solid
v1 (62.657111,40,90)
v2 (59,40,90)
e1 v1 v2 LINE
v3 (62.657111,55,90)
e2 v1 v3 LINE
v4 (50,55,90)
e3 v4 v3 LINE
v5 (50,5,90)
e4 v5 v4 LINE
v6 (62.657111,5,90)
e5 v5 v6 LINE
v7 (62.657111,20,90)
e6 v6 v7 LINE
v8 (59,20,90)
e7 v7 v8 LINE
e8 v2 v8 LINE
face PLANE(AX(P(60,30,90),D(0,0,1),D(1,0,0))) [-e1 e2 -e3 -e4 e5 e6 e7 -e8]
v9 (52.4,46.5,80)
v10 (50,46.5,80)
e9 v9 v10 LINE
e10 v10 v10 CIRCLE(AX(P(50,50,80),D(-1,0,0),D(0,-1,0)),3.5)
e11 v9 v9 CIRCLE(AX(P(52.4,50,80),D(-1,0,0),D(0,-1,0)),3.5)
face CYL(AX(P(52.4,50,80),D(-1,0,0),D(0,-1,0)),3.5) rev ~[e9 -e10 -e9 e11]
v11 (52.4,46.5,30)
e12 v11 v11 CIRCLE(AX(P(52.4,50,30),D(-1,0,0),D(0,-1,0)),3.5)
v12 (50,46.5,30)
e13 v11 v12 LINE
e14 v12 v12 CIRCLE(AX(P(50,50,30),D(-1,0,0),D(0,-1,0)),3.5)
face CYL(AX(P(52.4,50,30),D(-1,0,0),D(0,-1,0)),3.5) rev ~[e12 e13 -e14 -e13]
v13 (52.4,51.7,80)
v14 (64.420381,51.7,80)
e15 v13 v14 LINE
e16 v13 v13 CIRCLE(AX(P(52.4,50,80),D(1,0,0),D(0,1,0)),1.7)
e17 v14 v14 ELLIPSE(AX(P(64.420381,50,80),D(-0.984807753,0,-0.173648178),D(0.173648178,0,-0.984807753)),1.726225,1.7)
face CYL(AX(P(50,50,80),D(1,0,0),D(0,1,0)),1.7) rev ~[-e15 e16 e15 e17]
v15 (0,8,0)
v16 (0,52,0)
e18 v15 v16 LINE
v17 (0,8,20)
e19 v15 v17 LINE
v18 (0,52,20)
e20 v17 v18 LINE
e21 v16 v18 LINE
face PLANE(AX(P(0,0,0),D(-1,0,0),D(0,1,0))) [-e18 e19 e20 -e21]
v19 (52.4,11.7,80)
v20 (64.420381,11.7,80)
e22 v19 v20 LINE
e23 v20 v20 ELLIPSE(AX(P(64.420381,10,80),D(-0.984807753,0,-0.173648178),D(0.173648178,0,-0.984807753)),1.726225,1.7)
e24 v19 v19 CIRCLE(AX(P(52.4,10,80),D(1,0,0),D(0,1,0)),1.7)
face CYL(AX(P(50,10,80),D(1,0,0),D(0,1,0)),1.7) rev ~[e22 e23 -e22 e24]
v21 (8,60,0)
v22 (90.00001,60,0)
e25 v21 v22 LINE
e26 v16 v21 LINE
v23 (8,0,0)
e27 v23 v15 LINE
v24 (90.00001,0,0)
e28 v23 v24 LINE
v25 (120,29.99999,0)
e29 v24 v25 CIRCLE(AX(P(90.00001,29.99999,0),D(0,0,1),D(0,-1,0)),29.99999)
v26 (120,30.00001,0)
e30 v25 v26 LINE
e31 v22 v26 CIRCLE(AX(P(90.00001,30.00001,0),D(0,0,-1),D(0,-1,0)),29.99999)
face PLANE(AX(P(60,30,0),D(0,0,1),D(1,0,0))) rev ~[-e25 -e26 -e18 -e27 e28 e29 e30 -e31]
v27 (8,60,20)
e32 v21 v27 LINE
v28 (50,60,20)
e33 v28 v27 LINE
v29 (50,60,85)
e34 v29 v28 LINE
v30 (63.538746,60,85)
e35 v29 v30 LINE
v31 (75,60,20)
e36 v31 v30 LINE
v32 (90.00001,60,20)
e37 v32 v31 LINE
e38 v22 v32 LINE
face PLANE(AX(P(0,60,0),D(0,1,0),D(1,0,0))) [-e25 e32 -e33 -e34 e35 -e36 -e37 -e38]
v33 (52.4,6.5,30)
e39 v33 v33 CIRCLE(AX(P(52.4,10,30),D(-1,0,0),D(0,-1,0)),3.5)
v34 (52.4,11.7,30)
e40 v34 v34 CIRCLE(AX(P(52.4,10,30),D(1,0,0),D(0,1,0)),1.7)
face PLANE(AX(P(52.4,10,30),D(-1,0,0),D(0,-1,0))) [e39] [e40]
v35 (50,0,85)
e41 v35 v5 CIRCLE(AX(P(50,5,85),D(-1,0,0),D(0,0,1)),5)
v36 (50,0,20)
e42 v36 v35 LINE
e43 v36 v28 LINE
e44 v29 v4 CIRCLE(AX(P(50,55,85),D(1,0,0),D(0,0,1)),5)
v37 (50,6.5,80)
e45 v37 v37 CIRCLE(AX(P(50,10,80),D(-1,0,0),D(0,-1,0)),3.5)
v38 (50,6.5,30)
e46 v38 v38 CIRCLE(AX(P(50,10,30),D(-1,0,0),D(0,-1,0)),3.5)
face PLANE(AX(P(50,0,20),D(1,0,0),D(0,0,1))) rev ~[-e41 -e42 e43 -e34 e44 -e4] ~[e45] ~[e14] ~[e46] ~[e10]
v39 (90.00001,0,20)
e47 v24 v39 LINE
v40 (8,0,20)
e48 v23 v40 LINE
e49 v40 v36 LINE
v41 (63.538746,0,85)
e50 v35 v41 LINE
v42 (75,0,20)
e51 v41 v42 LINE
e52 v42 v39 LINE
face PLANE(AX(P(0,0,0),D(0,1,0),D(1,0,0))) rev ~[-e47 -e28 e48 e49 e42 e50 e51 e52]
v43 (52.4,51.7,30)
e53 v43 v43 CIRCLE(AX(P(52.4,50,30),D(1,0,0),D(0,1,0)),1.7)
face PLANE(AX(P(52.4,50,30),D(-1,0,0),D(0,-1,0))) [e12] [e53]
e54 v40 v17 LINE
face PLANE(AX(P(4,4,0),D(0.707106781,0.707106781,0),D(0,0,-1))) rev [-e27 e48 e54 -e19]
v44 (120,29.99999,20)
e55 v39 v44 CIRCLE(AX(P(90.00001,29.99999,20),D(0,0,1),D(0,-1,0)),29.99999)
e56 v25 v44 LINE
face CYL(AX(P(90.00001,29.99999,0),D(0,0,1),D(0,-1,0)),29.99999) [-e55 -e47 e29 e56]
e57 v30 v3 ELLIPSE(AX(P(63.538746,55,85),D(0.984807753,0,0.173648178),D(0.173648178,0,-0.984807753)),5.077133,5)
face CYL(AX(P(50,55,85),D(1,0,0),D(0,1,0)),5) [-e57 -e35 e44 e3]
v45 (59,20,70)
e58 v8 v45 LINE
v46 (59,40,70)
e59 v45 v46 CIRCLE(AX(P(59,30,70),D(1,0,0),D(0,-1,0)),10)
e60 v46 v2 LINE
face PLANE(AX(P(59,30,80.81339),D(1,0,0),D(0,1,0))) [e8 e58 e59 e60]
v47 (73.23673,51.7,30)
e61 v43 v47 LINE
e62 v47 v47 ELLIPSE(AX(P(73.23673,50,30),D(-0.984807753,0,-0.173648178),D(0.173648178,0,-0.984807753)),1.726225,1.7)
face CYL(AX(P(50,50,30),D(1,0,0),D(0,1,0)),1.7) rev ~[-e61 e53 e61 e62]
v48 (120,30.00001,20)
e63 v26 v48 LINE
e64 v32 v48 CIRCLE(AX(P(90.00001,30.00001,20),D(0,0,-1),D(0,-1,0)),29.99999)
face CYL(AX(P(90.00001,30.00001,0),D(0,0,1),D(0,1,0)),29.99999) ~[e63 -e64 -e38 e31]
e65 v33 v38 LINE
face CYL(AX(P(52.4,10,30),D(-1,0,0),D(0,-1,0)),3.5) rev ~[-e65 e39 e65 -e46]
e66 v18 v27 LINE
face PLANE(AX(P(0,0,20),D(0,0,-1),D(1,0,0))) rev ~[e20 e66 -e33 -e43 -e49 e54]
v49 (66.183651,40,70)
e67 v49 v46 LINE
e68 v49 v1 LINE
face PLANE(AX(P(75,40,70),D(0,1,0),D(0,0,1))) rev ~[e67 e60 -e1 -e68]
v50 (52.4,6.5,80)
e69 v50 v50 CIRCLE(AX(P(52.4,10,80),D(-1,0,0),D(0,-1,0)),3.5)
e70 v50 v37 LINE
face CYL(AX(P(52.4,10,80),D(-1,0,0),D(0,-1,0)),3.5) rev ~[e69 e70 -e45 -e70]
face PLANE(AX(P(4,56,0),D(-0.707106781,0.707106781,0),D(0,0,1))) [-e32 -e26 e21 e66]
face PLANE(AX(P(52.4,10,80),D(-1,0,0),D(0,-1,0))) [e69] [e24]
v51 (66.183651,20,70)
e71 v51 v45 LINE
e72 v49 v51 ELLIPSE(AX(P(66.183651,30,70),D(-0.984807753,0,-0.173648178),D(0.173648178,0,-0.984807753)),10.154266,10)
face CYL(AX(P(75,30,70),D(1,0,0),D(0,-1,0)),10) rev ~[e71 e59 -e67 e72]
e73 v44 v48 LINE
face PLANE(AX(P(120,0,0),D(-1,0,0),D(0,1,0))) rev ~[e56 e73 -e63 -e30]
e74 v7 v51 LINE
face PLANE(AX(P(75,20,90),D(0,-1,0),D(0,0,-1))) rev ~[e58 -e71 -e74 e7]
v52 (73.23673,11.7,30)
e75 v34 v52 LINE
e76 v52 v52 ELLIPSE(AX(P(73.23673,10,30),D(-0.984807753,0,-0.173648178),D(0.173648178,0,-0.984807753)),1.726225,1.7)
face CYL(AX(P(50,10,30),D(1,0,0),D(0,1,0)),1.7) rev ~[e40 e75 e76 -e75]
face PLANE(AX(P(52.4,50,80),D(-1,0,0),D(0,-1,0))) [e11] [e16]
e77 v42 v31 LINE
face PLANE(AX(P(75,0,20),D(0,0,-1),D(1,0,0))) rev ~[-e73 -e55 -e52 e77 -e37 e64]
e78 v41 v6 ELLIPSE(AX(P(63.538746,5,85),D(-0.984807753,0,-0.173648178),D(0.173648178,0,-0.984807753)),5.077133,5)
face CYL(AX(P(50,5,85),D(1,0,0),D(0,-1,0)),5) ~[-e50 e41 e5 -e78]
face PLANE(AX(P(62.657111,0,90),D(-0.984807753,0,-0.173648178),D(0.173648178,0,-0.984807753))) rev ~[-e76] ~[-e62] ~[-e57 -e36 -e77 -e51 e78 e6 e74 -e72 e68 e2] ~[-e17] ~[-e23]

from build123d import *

# Parameters (mm, degrees)
F0_W           = 120
F0_H           = 60
F1_DEPTH       = 90
F2_W           = 50
F2_H           = 70
F2_W_2         = 45
F3_DEPTH       = 60.001
F4_R           = 29.99999
F5_SIZE        = 8
F7_D           = 3.4
F7_CBORE_D     = 7
F7_CBORE_DEPTH = 2.4
F9_DEPTH       = 16
F11_DEPTH      = 60.001
F12_R          = 5


# Not quite as in the source:
# - a fillet or chamfer is up to 0.001 mm smaller than in the source, because OpenCascade refuses the exact size


with BuildPart() as f1:
    # F0 (on Top) → F1 (new body)
    with BuildSketch(Plane.XY):
        with Locations((60, 30)):
            Rectangle(F0_W, F0_H)
    extrude(amount=F1_DEPTH)

    # F2 (on face) → F3 (cut, through all)
    with BuildSketch(Plane.XZ):
        with Locations((25, 55)):
            Rectangle(F2_W, F2_H)
        with Locations((97.5, 55)):
            Rectangle(F2_W_2, F2_H)
    extrude(amount=-F3_DEPTH, mode=Mode.SUBTRACT)

    # F4 (radius 30 in the source; OpenCascade refuses exactly that, so slightly less here)
    f4_edges = [f1.edges().sort_by_distance(p)[0] for p in [
        (120, 60, 10),
        (120, 0, 10),
    ]]
    fillet(f4_edges, radius=F4_R)

    # F5
    f5_edges = [f1.edges().sort_by_distance(p)[0] for p in [
        (0, 60, 10),
        (0, 0, 10),
    ]]
    chamfer(f5_edges, length=F5_SIZE)

    # F7 (through all)
    with Locations(Plane(origin=(50, 0, 0), x_dir=(0, -1, 0), z_dir=(-1, 0, 0))):
        with Locations((-50, 80), (-10, 80), (-10, 30), (-50, 30)):
            CounterBoreHole(F7_D / 2, F7_CBORE_D / 2, F7_CBORE_DEPTH)

    # F8 (on face) → F9 (cut)
    with BuildSketch(Plane.YZ.offset(75)):
        with BuildLine():
            Line((40, 90), (20, 90))
            Line((20, 90), (20, 70))
            ThreePointArc((20, 70), (30, 80), (40, 70))
            Line((40, 70), (40, 90))
        make_face()
        with BuildLine():
            ThreePointArc((40, 70), (30, 80), (20, 70))
            Line((20, 70), (40, 70))
        make_face()
        with BuildLine():
            Line((40, 70), (20, 70))
            ThreePointArc((20, 70), (30, 60), (40, 70))
        make_face()
    extrude(amount=-F9_DEPTH, mode=Mode.SUBTRACT)

    # F10 (on face) → F11 (cut, through all)
    with BuildSketch(Plane.XZ):
        Polygon((62.6571113504, 90), (75, 20), (75, 90), align=None)
    extrude(amount=-F11_DEPTH, mode=Mode.SUBTRACT)

    # F12
    f12_edges = [f1.edges().sort_by_distance(p)[0] for p in [
        (56.328556, 60, 90),
        (56.328556, 0, 90),
    ]]
    fillet(f12_edges, radius=F12_R)


solid = f1.part
